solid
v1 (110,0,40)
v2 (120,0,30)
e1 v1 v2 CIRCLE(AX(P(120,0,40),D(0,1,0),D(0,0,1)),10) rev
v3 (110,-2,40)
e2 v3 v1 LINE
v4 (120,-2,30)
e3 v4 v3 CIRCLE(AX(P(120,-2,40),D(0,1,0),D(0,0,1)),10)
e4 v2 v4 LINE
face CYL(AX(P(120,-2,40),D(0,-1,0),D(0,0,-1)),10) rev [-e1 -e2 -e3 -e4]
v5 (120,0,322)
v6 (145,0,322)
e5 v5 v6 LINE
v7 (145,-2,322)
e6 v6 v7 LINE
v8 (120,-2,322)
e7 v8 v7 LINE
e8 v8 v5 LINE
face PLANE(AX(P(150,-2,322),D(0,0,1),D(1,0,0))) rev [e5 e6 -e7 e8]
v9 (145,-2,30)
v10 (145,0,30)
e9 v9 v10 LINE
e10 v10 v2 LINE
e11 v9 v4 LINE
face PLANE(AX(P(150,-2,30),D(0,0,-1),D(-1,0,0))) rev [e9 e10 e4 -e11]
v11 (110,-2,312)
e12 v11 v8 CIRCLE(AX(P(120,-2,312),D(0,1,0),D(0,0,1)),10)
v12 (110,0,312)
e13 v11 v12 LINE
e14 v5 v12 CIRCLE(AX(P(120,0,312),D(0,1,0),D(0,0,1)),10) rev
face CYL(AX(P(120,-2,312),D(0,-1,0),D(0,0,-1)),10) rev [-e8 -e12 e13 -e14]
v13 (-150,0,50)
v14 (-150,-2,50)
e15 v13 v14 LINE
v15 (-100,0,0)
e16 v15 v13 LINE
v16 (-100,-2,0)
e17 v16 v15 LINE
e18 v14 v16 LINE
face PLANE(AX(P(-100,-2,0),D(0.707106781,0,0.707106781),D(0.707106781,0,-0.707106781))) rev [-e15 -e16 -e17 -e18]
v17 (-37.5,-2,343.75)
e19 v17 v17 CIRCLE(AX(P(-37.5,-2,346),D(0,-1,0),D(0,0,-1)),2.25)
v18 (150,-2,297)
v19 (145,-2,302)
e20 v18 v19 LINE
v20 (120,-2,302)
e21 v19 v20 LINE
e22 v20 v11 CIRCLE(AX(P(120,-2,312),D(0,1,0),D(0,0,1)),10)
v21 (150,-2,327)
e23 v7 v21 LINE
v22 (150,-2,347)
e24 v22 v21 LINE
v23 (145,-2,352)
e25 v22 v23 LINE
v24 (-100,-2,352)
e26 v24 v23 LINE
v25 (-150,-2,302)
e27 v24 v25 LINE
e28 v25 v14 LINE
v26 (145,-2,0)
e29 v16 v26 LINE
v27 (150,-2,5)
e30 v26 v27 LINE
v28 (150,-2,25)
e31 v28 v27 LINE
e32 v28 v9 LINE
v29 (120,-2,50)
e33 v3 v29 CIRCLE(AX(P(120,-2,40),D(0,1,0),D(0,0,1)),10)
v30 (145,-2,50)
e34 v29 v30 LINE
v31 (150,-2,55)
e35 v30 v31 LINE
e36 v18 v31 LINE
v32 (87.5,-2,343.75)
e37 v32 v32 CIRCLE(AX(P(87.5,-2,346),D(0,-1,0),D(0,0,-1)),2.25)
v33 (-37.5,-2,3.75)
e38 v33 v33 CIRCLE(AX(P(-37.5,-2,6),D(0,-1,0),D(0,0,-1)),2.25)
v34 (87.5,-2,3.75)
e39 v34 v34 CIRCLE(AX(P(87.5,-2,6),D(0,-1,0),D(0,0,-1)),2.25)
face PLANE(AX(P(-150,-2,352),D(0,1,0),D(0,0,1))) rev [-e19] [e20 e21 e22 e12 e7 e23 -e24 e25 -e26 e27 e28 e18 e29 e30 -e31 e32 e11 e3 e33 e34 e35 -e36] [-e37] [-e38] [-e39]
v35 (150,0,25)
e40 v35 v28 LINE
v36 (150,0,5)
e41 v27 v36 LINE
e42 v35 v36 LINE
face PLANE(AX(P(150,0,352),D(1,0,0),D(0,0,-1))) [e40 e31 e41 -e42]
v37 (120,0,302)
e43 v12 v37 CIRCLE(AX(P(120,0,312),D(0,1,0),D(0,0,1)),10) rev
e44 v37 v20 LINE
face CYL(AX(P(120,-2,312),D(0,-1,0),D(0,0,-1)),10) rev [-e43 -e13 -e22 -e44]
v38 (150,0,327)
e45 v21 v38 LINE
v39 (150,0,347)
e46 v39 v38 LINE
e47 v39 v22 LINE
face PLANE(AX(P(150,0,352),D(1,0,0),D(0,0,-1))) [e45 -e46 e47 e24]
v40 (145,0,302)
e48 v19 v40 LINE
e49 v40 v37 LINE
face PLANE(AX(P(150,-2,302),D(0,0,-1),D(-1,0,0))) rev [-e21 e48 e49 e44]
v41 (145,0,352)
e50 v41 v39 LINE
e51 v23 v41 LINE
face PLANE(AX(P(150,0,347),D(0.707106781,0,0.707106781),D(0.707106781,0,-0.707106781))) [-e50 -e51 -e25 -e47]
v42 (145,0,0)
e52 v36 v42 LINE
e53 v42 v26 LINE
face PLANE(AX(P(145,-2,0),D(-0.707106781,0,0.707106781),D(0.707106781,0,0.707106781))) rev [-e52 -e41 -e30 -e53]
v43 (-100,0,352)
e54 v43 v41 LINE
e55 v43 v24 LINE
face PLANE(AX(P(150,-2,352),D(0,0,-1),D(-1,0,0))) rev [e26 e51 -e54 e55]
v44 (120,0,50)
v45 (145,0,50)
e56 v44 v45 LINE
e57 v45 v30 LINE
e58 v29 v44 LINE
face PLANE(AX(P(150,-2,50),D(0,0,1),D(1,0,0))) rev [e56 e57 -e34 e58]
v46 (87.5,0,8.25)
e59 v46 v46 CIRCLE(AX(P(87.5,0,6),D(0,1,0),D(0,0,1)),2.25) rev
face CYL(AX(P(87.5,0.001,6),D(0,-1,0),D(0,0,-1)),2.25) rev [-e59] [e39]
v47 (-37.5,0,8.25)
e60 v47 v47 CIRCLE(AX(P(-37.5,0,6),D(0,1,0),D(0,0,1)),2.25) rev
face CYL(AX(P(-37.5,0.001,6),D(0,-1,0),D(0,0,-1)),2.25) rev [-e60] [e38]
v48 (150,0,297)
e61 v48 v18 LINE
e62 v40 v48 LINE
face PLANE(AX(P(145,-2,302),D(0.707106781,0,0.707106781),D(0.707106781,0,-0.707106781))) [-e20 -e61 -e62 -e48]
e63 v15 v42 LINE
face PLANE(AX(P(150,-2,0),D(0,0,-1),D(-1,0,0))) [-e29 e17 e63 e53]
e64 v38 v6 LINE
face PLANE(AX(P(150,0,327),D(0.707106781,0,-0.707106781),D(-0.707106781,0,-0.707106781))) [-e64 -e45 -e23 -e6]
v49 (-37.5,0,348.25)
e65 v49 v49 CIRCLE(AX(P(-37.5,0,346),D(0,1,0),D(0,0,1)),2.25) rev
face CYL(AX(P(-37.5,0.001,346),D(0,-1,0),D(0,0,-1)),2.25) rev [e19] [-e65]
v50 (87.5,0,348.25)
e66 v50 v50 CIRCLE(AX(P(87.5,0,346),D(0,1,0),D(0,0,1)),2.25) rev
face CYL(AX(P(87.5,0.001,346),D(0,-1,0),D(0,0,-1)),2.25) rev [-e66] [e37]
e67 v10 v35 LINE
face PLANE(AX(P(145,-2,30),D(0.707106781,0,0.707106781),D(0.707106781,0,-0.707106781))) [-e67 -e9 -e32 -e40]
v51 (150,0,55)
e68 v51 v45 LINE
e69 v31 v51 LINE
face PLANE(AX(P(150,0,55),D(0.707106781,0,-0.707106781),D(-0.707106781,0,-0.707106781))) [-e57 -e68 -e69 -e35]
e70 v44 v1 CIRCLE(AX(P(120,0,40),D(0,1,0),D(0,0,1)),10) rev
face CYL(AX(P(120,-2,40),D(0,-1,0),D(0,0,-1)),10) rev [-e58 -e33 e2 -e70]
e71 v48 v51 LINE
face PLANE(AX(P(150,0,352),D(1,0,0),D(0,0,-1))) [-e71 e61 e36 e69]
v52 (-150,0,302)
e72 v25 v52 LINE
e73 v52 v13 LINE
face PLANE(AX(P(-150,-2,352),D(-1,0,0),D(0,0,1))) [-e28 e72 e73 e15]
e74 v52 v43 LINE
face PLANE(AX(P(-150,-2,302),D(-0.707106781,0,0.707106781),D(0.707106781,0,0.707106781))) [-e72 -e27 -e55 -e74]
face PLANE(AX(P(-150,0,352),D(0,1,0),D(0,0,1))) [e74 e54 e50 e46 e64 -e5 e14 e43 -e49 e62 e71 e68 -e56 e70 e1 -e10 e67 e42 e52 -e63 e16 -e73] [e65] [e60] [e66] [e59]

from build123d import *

# Parameters (mm, degrees)
SKETCH1_W          = 300
SKETCH1_H          = 2
BASE_FLANGE1_DEPTH = 352
CHAMFER1_SIZE      = 5
CHAMFER2_SIZE      = 50
CUT_EXTRUDE1_REACH = 384.633
SKETCH2_R          = 2.25
SKETCH3_W          = 40
SKETCH3_H          = 20
CUT_EXTRUDE2_DEPTH = 383.632983419
FILLET1_R          = 10
CHAMFER3_SIZE      = 5


# Sheet-metal steps are written as plain solids
with BuildPart() as part:
    # Sketch1 → Base-Flange1 (new body)
    with BuildSketch(Plane.XY):
        with Locations((0, -1)):
            Rectangle(SKETCH1_W, SKETCH1_H)
    extrude(amount=BASE_FLANGE1_DEPTH)

    # Chamfer1
    chamfer1_edges = [part.edges().sort_by_distance(p)[0] for p in [
        (150, -1, 0),
        (150, -1, 352),
    ]]
    chamfer(chamfer1_edges, length=CHAMFER1_SIZE)

    # Chamfer2
    chamfer2_edges = [part.edges().sort_by_distance(p)[0] for p in [
        (-150, -1, 352),
        (-150, -1, 0),
    ]]
    chamfer(chamfer2_edges, length=CHAMFER2_SIZE)

    # Sketch2 → Cut-Extrude1 (cut, up to next)
    with BuildSketch(Plane.XZ.offset(2), mode=Mode.PRIVATE) as cut_extrude1_sk1:
        with Locations(Location((-37.5, 346, 0), (0, 0, 270))):
            Circle(SKETCH2_R)
    cut_extrude1_tool1 = extrude(cut_extrude1_sk1.sketch, amount=-CUT_EXTRUDE1_REACH, mode=Mode.PRIVATE) & part.part
    # Sketch2 → Cut-Extrude1 (cut, up to next)
    with BuildSketch(Plane.XZ.offset(2), mode=Mode.PRIVATE) as cut_extrude1_sk2:
        with Locations(Location((87.5, 346, 0), (0, 0, 270))):
            Circle(SKETCH2_R)
    cut_extrude1_tool2 = extrude(cut_extrude1_sk2.sketch, amount=-CUT_EXTRUDE1_REACH, mode=Mode.PRIVATE) & part.part
    # Sketch2 → Cut-Extrude1 (cut, up to next)
    with BuildSketch(Plane.XZ.offset(2), mode=Mode.PRIVATE) as cut_extrude1_sk3:
        with Locations(Location((87.5, 6, 0), (0, 0, 270))):
            Circle(SKETCH2_R)
    cut_extrude1_tool3 = extrude(cut_extrude1_sk3.sketch, amount=-CUT_EXTRUDE1_REACH, mode=Mode.PRIVATE) & part.part
    # Sketch2 → Cut-Extrude1 (cut, up to next)
    with BuildSketch(Plane.XZ.offset(2), mode=Mode.PRIVATE) as cut_extrude1_sk4:
        with Locations(Location((-37.5, 6, 0), (0, 0, 270))):
            Circle(SKETCH2_R)
    cut_extrude1_tool4 = extrude(cut_extrude1_sk4.sketch, amount=-CUT_EXTRUDE1_REACH, mode=Mode.PRIVATE) & part.part
    add(cut_extrude1_tool1.solids().sort_by_distance((-37.5, -2, 346))[0], mode=Mode.SUBTRACT)
    add(cut_extrude1_tool2.solids().sort_by_distance((87.5, -2, 346))[0], mode=Mode.SUBTRACT)
    add(cut_extrude1_tool3.solids().sort_by_distance((87.5, -2, 6))[0], mode=Mode.SUBTRACT)
    add(cut_extrude1_tool4.solids().sort_by_distance((-37.5, -2, 6))[0], mode=Mode.SUBTRACT)

    # Sketch3 → Cut-Extrude2 (cut, through all)
    with BuildSketch(Plane(origin=(0, 0, 0), x_dir=(1, 0, 0), z_dir=(0, 1, 0))):
        with Locations((130, -40)):
            Rectangle(SKETCH3_W, SKETCH3_H)
        with Locations((130, -312)):
            Rectangle(SKETCH3_W, SKETCH3_H)
    extrude(amount=-CUT_EXTRUDE2_DEPTH, mode=Mode.SUBTRACT)

    # Fillet1
    fillet1_edges = [part.edges().sort_by_distance(p)[0] for p in [
        (110, -1, 322),
        (110, -1, 302),
        (110, -1, 50),
        (110, -1, 30),
    ]]
    fillet(fillet1_edges, radius=FILLET1_R - 0.0001)  # a hair under: the kernel refuses the full size

    # Chamfer3
    chamfer3_edges = [part.edges().sort_by_distance(p)[0] for p in [
        (150, -1, 30),
        (150, -1, 50),
        (150, -1, 322),
        (150, -1, 302),
    ]]
    chamfer(chamfer3_edges, length=CHAMFER3_SIZE)


solid = part.part
